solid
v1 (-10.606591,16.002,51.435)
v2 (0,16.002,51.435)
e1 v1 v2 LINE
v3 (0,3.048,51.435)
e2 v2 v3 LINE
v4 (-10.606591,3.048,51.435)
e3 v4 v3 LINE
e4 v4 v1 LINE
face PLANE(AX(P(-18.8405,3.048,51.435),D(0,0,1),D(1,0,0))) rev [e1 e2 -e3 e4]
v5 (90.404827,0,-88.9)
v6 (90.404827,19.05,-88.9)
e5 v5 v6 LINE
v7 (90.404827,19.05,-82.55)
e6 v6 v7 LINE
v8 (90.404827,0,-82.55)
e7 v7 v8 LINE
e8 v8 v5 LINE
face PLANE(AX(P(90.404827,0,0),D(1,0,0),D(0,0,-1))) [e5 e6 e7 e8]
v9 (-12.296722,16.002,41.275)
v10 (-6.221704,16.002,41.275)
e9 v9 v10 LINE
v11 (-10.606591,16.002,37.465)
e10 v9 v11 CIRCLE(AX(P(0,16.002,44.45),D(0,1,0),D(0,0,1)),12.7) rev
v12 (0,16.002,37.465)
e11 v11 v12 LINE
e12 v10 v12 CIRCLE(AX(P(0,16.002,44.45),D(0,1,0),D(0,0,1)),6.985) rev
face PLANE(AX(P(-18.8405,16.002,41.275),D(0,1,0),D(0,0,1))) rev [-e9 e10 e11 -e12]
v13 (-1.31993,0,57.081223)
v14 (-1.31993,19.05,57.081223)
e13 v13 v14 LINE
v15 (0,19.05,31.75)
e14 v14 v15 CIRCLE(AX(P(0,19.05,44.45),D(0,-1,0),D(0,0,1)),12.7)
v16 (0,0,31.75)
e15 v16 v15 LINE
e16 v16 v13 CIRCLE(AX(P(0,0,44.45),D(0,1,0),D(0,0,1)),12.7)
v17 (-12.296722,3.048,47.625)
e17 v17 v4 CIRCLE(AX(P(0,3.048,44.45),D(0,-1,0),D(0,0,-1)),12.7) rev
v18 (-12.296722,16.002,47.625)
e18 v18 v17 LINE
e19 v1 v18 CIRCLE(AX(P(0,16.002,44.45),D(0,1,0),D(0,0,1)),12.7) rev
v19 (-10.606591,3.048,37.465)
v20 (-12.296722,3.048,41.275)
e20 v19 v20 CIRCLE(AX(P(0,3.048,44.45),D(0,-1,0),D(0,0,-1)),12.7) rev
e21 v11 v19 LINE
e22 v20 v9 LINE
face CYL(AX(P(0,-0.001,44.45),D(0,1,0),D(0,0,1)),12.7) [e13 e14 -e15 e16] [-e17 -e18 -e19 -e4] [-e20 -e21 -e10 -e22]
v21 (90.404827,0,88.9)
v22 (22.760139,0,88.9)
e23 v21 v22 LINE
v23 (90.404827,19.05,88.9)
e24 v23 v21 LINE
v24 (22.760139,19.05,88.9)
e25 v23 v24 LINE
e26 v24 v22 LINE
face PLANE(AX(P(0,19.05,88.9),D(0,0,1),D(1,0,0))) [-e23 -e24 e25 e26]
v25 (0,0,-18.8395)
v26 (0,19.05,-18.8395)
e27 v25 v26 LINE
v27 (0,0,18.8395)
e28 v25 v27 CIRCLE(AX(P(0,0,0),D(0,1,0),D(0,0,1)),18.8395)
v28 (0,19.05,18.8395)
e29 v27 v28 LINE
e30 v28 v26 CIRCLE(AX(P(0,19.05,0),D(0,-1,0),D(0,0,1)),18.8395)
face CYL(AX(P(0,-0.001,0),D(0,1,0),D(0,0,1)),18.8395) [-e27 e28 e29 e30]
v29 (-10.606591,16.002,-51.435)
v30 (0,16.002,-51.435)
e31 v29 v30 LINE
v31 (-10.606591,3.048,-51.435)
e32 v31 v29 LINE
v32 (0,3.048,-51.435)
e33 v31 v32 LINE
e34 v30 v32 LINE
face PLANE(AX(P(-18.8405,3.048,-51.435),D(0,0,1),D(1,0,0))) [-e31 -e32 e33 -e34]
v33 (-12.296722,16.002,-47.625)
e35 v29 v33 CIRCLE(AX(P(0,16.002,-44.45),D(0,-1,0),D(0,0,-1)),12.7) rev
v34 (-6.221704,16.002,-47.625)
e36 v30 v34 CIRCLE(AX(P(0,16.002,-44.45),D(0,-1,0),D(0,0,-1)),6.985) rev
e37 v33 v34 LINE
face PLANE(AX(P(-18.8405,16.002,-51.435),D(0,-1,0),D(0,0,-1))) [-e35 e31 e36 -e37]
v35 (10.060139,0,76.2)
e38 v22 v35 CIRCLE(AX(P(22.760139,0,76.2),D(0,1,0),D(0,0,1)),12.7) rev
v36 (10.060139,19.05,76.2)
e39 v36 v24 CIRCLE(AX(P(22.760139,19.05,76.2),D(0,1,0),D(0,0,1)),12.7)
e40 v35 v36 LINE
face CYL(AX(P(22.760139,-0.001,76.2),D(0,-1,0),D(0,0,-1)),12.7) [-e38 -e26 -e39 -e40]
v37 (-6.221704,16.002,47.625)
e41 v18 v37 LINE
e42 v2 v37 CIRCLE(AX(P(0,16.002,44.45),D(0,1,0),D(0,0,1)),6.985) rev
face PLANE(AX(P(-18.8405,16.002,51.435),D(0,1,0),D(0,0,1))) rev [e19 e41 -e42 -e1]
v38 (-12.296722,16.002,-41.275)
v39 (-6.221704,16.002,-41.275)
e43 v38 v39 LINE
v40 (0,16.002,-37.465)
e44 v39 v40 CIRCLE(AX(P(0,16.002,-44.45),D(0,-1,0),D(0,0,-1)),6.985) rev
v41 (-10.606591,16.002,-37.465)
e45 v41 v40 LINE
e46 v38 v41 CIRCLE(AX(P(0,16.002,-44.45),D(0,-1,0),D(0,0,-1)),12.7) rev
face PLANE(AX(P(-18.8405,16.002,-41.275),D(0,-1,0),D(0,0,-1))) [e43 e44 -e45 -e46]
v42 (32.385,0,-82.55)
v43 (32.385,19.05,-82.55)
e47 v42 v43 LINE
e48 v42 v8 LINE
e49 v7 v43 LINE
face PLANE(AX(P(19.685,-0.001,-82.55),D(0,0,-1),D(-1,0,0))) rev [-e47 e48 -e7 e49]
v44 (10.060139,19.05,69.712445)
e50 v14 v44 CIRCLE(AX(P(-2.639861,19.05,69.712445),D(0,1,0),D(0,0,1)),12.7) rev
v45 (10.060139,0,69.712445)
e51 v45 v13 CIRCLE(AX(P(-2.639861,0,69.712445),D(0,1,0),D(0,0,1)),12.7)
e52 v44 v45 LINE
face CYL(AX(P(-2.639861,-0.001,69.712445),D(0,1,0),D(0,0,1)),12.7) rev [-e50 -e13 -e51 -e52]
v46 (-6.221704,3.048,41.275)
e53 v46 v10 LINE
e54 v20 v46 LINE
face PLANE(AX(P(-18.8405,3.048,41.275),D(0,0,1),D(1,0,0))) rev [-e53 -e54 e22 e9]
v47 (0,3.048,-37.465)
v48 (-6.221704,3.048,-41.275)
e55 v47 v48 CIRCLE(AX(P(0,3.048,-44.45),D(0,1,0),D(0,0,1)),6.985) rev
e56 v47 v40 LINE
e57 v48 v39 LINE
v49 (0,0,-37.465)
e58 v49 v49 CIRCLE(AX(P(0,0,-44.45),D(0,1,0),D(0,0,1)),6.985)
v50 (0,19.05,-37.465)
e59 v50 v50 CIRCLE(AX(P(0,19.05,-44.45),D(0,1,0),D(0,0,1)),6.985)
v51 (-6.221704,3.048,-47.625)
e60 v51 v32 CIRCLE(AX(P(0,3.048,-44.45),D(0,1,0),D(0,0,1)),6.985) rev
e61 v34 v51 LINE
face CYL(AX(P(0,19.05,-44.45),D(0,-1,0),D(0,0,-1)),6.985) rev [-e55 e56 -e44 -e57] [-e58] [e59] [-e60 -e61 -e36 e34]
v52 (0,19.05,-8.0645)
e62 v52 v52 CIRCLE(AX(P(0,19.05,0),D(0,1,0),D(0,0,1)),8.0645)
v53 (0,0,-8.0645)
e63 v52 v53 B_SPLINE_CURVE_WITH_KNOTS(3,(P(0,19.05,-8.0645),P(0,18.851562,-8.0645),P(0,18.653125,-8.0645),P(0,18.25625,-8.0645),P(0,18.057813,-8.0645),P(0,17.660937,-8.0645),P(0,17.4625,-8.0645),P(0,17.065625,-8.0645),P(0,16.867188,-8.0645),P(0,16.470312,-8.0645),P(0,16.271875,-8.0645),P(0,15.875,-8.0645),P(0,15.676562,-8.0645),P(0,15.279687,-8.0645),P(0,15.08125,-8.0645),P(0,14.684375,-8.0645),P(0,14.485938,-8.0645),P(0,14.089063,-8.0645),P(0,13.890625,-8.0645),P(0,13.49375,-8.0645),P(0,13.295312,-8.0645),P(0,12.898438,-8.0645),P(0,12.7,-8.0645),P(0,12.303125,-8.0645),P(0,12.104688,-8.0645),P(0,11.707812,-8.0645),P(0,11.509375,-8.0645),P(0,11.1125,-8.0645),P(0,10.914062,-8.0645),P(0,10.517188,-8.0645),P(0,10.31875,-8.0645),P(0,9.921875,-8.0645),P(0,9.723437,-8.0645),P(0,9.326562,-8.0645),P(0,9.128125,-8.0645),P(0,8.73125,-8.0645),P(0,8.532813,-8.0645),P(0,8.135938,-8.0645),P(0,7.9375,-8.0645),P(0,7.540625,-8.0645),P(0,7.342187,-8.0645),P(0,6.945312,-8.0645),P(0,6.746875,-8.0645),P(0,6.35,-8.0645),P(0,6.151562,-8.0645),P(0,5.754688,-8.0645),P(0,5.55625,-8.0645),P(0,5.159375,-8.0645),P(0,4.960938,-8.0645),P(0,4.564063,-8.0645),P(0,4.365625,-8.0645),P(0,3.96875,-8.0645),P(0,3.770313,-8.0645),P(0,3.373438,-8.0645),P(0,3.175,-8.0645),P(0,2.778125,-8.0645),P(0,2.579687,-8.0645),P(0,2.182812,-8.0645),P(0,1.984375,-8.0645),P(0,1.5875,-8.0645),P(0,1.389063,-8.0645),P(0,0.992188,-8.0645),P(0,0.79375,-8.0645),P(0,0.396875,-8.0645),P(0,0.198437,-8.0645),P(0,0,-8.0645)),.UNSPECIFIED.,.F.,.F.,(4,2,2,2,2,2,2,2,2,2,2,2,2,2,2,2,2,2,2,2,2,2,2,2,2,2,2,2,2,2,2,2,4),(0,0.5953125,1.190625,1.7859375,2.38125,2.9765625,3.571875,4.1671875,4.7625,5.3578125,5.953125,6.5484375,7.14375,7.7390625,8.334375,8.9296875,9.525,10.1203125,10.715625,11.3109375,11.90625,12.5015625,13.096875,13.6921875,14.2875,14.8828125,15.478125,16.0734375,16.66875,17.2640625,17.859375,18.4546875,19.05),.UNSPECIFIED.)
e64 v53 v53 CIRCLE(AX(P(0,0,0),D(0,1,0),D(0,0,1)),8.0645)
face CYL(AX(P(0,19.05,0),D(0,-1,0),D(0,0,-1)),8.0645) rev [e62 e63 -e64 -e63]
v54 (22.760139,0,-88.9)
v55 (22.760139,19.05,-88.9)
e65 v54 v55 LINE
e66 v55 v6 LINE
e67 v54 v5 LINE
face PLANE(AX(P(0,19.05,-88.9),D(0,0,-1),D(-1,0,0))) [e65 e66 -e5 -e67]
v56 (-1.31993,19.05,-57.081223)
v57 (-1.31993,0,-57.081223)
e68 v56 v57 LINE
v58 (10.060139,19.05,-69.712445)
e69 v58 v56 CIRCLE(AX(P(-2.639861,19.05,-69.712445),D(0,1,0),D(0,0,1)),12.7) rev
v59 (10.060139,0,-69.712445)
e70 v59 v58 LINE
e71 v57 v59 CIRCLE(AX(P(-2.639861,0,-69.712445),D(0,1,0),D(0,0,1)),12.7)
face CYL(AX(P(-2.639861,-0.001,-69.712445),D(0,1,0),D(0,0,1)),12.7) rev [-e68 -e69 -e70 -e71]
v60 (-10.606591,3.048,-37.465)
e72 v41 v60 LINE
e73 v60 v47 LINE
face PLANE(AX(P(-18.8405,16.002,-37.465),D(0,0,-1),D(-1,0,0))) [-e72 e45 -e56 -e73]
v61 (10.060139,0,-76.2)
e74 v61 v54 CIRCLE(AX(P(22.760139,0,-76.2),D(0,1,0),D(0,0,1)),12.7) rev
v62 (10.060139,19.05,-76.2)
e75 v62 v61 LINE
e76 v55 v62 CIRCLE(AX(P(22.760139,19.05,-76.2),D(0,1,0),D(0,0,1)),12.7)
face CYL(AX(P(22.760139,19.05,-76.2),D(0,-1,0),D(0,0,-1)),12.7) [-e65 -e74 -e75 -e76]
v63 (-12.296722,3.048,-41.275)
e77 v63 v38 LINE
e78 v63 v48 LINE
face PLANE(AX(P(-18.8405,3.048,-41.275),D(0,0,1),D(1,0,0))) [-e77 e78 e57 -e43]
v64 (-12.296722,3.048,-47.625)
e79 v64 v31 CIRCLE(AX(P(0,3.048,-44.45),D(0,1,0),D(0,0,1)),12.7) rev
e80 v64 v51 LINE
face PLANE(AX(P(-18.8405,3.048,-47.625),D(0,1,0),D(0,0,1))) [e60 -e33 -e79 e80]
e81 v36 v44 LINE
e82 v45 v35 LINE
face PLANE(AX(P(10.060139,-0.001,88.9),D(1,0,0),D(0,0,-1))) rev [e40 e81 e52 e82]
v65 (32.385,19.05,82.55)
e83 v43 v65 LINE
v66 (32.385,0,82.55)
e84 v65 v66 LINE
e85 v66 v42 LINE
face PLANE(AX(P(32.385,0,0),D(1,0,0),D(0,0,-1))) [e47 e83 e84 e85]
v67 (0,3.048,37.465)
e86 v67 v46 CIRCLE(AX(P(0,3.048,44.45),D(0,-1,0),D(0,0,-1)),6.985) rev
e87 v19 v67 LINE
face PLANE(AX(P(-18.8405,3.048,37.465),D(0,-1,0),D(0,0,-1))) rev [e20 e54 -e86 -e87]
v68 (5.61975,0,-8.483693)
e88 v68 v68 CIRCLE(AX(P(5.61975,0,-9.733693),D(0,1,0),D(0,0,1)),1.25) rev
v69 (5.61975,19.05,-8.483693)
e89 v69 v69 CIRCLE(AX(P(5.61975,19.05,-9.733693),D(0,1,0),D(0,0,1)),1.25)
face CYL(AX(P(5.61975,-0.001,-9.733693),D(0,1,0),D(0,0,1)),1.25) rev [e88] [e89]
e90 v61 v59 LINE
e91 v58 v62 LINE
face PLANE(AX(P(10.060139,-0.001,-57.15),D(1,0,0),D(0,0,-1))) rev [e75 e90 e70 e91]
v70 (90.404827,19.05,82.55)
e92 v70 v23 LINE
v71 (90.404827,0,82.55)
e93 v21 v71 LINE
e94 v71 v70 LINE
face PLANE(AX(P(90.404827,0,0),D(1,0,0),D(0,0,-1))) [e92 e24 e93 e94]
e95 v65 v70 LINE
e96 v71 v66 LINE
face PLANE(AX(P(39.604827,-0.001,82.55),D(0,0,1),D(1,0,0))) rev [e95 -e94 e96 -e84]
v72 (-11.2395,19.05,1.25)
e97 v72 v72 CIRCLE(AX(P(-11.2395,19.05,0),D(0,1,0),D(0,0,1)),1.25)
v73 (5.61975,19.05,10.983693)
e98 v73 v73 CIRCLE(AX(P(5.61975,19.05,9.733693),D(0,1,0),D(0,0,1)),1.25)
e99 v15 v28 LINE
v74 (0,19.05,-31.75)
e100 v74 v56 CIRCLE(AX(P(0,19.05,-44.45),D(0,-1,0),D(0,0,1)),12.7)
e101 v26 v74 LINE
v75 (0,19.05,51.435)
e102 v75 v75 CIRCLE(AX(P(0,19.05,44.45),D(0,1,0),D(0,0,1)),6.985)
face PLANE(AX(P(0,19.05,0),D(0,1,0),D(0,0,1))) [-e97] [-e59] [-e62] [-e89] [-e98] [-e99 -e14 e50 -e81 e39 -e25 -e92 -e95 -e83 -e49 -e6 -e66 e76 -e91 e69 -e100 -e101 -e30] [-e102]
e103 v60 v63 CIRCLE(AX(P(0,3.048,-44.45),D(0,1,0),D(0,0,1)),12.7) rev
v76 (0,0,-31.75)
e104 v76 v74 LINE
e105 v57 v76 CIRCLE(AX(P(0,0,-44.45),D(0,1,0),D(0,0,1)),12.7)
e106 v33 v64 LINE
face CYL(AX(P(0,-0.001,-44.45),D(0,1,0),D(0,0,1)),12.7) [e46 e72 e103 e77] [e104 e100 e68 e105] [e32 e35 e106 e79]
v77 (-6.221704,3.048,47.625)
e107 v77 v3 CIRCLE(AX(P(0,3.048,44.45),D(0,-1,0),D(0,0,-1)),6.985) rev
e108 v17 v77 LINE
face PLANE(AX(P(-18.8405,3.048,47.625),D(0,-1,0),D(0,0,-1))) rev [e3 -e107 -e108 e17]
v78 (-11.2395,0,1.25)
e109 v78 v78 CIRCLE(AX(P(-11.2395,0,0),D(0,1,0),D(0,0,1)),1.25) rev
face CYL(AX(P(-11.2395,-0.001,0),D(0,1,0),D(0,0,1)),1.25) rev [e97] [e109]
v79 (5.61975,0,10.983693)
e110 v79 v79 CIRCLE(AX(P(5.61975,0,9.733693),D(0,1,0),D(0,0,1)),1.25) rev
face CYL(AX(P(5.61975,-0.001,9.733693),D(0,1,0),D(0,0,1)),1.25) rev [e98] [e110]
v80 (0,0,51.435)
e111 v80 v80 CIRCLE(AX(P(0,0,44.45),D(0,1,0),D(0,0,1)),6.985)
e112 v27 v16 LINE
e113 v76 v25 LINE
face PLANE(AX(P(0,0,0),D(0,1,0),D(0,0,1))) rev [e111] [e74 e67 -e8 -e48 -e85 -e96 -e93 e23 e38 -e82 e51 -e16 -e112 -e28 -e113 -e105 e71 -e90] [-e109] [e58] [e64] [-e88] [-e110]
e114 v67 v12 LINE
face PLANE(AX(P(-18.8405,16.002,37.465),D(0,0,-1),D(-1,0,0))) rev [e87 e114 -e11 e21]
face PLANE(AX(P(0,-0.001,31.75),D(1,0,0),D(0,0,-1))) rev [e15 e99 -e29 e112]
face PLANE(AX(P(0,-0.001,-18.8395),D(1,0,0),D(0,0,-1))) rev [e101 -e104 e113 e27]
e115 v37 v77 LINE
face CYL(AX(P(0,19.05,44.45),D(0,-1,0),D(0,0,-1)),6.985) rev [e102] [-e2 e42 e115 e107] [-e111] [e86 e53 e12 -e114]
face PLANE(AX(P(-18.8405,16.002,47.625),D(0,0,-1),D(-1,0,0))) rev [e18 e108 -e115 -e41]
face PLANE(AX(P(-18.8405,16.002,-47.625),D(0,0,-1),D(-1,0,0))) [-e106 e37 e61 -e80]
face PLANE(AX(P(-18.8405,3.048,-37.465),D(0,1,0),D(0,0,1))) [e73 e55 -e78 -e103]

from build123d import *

# Parameters (mm, degrees)
SKETCH1_W             = 79.209653246
SKETCH1_H             = 177.8
SKETCH1_R             = 8.0645
SKETCH1_R_2           = 6.985
EXTRUSION4_DEPTH      = 19.05
EXTRUSION5_REACH      = 101.17
SKETCH2_R             = 1.25
EXTRUSION10_REACH     = 101.17
SKETCH3_W             = 19.919826623
SKETCH3_H             = 165.1
SKETCH4_W             = 6.35
SKETCH4_H             = 19.05
EXTRUSION11_DEPTH     = 50.8
SKETCH5_W             = 165.1
SKETCH5_H             = 19.05
EXTRUSION12_DEPTH     = 12.7
EXTRUSION14_REACH     = 130.215
EXTRUSION15_OUTLINE_W = 3.81
EXTRUSION15_OUTLINE_H = 12.954
EXTRUSION15_DEPTH     = 12.296722124
FILLET8_R             = 12.7


# Read off the part's stored shape, not the designer's step: Extrusion15
with BuildPart() as part:
    # Sketch1 → Extrusion4 (new body)
    with BuildSketch(Plane(origin=(0, 0, 0), x_dir=(-1, 0, 0), z_dir=(0, 1, 0))):
        Rectangle(SKETCH1_W, SKETCH1_H)
        with Locations(Location((0, 0, 0), (0, 0, 270))):
            Circle(SKETCH1_R, mode=Mode.SUBTRACT)
        with Locations(Location((0, 44.45, 0), (0, 0, 270))):
            Circle(SKETCH1_R_2, mode=Mode.SUBTRACT)
        with Locations(Location((0, -44.45, 0), (0, 0, 270))):
            Circle(SKETCH1_R_2, mode=Mode.SUBTRACT)
    extrude(amount=EXTRUSION4_DEPTH)

    # Sketch2 → Extrusion5 (cut, up to next)
    with BuildSketch(Plane(origin=(0, 19.05, 0), x_dir=(1, 0, 0), z_dir=(0, 1, 0)), mode=Mode.PRIVATE) as extrusion5_sk1:
        with Locations(Location((-11.2395, 0, 0), (0, 0, 270))):
            Circle(SKETCH2_R)
    extrusion5_tool1 = extrude(extrusion5_sk1.sketch, amount=-EXTRUSION5_REACH, mode=Mode.PRIVATE) & part.part
    # Sketch2 → Extrusion5 (cut, up to next)
    with BuildSketch(Plane(origin=(0, 19.05, 0), x_dir=(1, 0, 0), z_dir=(0, 1, 0)), mode=Mode.PRIVATE) as extrusion5_sk2:
        with Locations(Location((5.61975, -9.733692526, 0), (0, 0, 270))):
            Circle(SKETCH2_R)
    extrusion5_tool2 = extrude(extrusion5_sk2.sketch, amount=-EXTRUSION5_REACH, mode=Mode.PRIVATE) & part.part
    # Sketch2 → Extrusion5 (cut, up to next)
    with BuildSketch(Plane(origin=(0, 19.05, 0), x_dir=(1, 0, 0), z_dir=(0, 1, 0)), mode=Mode.PRIVATE) as extrusion5_sk3:
        with Locations(Location((5.61975, 9.733692526, 0), (0, 0, 270))):
            Circle(SKETCH2_R)
    extrusion5_tool3 = extrude(extrusion5_sk3.sketch, amount=-EXTRUSION5_REACH, mode=Mode.PRIVATE) & part.part
    add(extrusion5_tool1.solids().sort_by_distance((-11.2395, 19.05, 0))[0], mode=Mode.SUBTRACT)
    add(extrusion5_tool2.solids().sort_by_distance((5.61975, 19.05, 9.733693))[0], mode=Mode.SUBTRACT)
    add(extrusion5_tool3.solids().sort_by_distance((5.61975, 19.05, -9.733693))[0], mode=Mode.SUBTRACT)

    # Sketch3 → Extrusion10 (cut, up to next)
    with BuildSketch(Plane(origin=(0, 19.05, 0), x_dir=(1, 0, 0), z_dir=(0, 1, 0)), mode=Mode.PRIVATE) as extrusion10_sk1:
        with Locations((29.644913312, 0)):
            Rectangle(SKETCH3_W, SKETCH3_H)
    extrusion10_tool1 = extrude(extrusion10_sk1.sketch, amount=-EXTRUSION10_REACH, mode=Mode.PRIVATE) & part.part
    add(extrusion10_tool1.solids().sort_by_distance((29.644913, 19.05, 0))[0], mode=Mode.SUBTRACT)

    # Sketch4 → Extrusion11 (add)
    with BuildSketch(Plane(origin=(39.604826623, 0, 0), x_dir=(0, 0, -1), z_dir=(1, 0, 0))):
        with Locations((-85.725, 9.525)):
            Rectangle(SKETCH4_W, SKETCH4_H)
        with Locations((85.725, 9.525)):
            Rectangle(SKETCH4_W, SKETCH4_H)
    extrude(amount=EXTRUSION11_DEPTH)

    # Sketch5 → Extrusion12 (add)
    with BuildSketch(Plane(origin=(19.685, 0, 0), x_dir=(0, 0, -1), z_dir=(1, 0, 0))):
        with Locations((0, 9.525)):
            Rectangle(SKETCH5_W, SKETCH5_H)
    extrude(amount=EXTRUSION12_DEPTH)

    # Sketch6 → Extrusion14 (cut, up to next)
    with BuildSketch(Plane(origin=(0, 19.05, 0), x_dir=(1, 0, 0), z_dir=(0, 1, 0)), mode=Mode.PRIVATE) as extrusion14_sk1:
        with BuildLine():
            Line((0, 18.8395), (0, 31.75))
            ThreePointArc((0, 31.75), (-12.7, 44.45), (0, 57.15))
            Line((0, 57.15), (10.060139055, 57.15))
            Line((10.060139055, 57.15), (10.060139055, 88.9))
            Line((10.060139055, 88.9), (-39.604826623, 88.9))
            Line((-39.604826623, 88.9), (-39.604826623, -88.9))
            Line((-39.604826623, -88.9), (10.060139055, -88.9))
            Line((10.060139055, -88.9), (10.060139055, -57.15))
            Line((10.060139055, -57.15), (0, -57.15))
            ThreePointArc((0, -57.15), (-12.7, -44.45), (0, -31.75))
            Line((0, -31.75), (0, -18.8395))
            ThreePointArc((0, -18.8395), (-18.8395, 0), (0, 18.8395))
        make_face()
    extrusion14_tool1 = extrude(extrusion14_sk1.sketch, amount=-EXTRUSION14_REACH, mode=Mode.PRIVATE) & part.part
    add(extrusion14_tool1.solids().sort_by_distance((-19.50343, 19.05, 0))[0], mode=Mode.SUBTRACT)

    # Extrusion15 outline → Extrusion15 (cut)
    with BuildSketch(Plane.ZY):
        with Locations((-39.37, 9.525)):
            Rectangle(EXTRUSION15_OUTLINE_W, EXTRUSION15_OUTLINE_H)
        with Locations((-49.53, 9.525)):
            Rectangle(EXTRUSION15_OUTLINE_W, EXTRUSION15_OUTLINE_H)
    extrusion15 = extrude(amount=EXTRUSION15_DEPTH, mode=Mode.SUBTRACT)

    # Mirror3: Extrusion15 across plane
    add(extrusion15.mirror(Plane.XY), mode=Mode.SUBTRACT)

    # Fillet8
    fillet8_edges = [part.edges().sort_by_distance(p)[0] for p in [
        (10.060139055, 9.525, -57.15),
        (10.060139055, 9.525, -88.9),
        (10.060139055, 9.525, 88.9),
        (10.060139055, 9.525, 57.15),
    ]]
    fillet(fillet8_edges, radius=FILLET8_R)


solid = part.part
